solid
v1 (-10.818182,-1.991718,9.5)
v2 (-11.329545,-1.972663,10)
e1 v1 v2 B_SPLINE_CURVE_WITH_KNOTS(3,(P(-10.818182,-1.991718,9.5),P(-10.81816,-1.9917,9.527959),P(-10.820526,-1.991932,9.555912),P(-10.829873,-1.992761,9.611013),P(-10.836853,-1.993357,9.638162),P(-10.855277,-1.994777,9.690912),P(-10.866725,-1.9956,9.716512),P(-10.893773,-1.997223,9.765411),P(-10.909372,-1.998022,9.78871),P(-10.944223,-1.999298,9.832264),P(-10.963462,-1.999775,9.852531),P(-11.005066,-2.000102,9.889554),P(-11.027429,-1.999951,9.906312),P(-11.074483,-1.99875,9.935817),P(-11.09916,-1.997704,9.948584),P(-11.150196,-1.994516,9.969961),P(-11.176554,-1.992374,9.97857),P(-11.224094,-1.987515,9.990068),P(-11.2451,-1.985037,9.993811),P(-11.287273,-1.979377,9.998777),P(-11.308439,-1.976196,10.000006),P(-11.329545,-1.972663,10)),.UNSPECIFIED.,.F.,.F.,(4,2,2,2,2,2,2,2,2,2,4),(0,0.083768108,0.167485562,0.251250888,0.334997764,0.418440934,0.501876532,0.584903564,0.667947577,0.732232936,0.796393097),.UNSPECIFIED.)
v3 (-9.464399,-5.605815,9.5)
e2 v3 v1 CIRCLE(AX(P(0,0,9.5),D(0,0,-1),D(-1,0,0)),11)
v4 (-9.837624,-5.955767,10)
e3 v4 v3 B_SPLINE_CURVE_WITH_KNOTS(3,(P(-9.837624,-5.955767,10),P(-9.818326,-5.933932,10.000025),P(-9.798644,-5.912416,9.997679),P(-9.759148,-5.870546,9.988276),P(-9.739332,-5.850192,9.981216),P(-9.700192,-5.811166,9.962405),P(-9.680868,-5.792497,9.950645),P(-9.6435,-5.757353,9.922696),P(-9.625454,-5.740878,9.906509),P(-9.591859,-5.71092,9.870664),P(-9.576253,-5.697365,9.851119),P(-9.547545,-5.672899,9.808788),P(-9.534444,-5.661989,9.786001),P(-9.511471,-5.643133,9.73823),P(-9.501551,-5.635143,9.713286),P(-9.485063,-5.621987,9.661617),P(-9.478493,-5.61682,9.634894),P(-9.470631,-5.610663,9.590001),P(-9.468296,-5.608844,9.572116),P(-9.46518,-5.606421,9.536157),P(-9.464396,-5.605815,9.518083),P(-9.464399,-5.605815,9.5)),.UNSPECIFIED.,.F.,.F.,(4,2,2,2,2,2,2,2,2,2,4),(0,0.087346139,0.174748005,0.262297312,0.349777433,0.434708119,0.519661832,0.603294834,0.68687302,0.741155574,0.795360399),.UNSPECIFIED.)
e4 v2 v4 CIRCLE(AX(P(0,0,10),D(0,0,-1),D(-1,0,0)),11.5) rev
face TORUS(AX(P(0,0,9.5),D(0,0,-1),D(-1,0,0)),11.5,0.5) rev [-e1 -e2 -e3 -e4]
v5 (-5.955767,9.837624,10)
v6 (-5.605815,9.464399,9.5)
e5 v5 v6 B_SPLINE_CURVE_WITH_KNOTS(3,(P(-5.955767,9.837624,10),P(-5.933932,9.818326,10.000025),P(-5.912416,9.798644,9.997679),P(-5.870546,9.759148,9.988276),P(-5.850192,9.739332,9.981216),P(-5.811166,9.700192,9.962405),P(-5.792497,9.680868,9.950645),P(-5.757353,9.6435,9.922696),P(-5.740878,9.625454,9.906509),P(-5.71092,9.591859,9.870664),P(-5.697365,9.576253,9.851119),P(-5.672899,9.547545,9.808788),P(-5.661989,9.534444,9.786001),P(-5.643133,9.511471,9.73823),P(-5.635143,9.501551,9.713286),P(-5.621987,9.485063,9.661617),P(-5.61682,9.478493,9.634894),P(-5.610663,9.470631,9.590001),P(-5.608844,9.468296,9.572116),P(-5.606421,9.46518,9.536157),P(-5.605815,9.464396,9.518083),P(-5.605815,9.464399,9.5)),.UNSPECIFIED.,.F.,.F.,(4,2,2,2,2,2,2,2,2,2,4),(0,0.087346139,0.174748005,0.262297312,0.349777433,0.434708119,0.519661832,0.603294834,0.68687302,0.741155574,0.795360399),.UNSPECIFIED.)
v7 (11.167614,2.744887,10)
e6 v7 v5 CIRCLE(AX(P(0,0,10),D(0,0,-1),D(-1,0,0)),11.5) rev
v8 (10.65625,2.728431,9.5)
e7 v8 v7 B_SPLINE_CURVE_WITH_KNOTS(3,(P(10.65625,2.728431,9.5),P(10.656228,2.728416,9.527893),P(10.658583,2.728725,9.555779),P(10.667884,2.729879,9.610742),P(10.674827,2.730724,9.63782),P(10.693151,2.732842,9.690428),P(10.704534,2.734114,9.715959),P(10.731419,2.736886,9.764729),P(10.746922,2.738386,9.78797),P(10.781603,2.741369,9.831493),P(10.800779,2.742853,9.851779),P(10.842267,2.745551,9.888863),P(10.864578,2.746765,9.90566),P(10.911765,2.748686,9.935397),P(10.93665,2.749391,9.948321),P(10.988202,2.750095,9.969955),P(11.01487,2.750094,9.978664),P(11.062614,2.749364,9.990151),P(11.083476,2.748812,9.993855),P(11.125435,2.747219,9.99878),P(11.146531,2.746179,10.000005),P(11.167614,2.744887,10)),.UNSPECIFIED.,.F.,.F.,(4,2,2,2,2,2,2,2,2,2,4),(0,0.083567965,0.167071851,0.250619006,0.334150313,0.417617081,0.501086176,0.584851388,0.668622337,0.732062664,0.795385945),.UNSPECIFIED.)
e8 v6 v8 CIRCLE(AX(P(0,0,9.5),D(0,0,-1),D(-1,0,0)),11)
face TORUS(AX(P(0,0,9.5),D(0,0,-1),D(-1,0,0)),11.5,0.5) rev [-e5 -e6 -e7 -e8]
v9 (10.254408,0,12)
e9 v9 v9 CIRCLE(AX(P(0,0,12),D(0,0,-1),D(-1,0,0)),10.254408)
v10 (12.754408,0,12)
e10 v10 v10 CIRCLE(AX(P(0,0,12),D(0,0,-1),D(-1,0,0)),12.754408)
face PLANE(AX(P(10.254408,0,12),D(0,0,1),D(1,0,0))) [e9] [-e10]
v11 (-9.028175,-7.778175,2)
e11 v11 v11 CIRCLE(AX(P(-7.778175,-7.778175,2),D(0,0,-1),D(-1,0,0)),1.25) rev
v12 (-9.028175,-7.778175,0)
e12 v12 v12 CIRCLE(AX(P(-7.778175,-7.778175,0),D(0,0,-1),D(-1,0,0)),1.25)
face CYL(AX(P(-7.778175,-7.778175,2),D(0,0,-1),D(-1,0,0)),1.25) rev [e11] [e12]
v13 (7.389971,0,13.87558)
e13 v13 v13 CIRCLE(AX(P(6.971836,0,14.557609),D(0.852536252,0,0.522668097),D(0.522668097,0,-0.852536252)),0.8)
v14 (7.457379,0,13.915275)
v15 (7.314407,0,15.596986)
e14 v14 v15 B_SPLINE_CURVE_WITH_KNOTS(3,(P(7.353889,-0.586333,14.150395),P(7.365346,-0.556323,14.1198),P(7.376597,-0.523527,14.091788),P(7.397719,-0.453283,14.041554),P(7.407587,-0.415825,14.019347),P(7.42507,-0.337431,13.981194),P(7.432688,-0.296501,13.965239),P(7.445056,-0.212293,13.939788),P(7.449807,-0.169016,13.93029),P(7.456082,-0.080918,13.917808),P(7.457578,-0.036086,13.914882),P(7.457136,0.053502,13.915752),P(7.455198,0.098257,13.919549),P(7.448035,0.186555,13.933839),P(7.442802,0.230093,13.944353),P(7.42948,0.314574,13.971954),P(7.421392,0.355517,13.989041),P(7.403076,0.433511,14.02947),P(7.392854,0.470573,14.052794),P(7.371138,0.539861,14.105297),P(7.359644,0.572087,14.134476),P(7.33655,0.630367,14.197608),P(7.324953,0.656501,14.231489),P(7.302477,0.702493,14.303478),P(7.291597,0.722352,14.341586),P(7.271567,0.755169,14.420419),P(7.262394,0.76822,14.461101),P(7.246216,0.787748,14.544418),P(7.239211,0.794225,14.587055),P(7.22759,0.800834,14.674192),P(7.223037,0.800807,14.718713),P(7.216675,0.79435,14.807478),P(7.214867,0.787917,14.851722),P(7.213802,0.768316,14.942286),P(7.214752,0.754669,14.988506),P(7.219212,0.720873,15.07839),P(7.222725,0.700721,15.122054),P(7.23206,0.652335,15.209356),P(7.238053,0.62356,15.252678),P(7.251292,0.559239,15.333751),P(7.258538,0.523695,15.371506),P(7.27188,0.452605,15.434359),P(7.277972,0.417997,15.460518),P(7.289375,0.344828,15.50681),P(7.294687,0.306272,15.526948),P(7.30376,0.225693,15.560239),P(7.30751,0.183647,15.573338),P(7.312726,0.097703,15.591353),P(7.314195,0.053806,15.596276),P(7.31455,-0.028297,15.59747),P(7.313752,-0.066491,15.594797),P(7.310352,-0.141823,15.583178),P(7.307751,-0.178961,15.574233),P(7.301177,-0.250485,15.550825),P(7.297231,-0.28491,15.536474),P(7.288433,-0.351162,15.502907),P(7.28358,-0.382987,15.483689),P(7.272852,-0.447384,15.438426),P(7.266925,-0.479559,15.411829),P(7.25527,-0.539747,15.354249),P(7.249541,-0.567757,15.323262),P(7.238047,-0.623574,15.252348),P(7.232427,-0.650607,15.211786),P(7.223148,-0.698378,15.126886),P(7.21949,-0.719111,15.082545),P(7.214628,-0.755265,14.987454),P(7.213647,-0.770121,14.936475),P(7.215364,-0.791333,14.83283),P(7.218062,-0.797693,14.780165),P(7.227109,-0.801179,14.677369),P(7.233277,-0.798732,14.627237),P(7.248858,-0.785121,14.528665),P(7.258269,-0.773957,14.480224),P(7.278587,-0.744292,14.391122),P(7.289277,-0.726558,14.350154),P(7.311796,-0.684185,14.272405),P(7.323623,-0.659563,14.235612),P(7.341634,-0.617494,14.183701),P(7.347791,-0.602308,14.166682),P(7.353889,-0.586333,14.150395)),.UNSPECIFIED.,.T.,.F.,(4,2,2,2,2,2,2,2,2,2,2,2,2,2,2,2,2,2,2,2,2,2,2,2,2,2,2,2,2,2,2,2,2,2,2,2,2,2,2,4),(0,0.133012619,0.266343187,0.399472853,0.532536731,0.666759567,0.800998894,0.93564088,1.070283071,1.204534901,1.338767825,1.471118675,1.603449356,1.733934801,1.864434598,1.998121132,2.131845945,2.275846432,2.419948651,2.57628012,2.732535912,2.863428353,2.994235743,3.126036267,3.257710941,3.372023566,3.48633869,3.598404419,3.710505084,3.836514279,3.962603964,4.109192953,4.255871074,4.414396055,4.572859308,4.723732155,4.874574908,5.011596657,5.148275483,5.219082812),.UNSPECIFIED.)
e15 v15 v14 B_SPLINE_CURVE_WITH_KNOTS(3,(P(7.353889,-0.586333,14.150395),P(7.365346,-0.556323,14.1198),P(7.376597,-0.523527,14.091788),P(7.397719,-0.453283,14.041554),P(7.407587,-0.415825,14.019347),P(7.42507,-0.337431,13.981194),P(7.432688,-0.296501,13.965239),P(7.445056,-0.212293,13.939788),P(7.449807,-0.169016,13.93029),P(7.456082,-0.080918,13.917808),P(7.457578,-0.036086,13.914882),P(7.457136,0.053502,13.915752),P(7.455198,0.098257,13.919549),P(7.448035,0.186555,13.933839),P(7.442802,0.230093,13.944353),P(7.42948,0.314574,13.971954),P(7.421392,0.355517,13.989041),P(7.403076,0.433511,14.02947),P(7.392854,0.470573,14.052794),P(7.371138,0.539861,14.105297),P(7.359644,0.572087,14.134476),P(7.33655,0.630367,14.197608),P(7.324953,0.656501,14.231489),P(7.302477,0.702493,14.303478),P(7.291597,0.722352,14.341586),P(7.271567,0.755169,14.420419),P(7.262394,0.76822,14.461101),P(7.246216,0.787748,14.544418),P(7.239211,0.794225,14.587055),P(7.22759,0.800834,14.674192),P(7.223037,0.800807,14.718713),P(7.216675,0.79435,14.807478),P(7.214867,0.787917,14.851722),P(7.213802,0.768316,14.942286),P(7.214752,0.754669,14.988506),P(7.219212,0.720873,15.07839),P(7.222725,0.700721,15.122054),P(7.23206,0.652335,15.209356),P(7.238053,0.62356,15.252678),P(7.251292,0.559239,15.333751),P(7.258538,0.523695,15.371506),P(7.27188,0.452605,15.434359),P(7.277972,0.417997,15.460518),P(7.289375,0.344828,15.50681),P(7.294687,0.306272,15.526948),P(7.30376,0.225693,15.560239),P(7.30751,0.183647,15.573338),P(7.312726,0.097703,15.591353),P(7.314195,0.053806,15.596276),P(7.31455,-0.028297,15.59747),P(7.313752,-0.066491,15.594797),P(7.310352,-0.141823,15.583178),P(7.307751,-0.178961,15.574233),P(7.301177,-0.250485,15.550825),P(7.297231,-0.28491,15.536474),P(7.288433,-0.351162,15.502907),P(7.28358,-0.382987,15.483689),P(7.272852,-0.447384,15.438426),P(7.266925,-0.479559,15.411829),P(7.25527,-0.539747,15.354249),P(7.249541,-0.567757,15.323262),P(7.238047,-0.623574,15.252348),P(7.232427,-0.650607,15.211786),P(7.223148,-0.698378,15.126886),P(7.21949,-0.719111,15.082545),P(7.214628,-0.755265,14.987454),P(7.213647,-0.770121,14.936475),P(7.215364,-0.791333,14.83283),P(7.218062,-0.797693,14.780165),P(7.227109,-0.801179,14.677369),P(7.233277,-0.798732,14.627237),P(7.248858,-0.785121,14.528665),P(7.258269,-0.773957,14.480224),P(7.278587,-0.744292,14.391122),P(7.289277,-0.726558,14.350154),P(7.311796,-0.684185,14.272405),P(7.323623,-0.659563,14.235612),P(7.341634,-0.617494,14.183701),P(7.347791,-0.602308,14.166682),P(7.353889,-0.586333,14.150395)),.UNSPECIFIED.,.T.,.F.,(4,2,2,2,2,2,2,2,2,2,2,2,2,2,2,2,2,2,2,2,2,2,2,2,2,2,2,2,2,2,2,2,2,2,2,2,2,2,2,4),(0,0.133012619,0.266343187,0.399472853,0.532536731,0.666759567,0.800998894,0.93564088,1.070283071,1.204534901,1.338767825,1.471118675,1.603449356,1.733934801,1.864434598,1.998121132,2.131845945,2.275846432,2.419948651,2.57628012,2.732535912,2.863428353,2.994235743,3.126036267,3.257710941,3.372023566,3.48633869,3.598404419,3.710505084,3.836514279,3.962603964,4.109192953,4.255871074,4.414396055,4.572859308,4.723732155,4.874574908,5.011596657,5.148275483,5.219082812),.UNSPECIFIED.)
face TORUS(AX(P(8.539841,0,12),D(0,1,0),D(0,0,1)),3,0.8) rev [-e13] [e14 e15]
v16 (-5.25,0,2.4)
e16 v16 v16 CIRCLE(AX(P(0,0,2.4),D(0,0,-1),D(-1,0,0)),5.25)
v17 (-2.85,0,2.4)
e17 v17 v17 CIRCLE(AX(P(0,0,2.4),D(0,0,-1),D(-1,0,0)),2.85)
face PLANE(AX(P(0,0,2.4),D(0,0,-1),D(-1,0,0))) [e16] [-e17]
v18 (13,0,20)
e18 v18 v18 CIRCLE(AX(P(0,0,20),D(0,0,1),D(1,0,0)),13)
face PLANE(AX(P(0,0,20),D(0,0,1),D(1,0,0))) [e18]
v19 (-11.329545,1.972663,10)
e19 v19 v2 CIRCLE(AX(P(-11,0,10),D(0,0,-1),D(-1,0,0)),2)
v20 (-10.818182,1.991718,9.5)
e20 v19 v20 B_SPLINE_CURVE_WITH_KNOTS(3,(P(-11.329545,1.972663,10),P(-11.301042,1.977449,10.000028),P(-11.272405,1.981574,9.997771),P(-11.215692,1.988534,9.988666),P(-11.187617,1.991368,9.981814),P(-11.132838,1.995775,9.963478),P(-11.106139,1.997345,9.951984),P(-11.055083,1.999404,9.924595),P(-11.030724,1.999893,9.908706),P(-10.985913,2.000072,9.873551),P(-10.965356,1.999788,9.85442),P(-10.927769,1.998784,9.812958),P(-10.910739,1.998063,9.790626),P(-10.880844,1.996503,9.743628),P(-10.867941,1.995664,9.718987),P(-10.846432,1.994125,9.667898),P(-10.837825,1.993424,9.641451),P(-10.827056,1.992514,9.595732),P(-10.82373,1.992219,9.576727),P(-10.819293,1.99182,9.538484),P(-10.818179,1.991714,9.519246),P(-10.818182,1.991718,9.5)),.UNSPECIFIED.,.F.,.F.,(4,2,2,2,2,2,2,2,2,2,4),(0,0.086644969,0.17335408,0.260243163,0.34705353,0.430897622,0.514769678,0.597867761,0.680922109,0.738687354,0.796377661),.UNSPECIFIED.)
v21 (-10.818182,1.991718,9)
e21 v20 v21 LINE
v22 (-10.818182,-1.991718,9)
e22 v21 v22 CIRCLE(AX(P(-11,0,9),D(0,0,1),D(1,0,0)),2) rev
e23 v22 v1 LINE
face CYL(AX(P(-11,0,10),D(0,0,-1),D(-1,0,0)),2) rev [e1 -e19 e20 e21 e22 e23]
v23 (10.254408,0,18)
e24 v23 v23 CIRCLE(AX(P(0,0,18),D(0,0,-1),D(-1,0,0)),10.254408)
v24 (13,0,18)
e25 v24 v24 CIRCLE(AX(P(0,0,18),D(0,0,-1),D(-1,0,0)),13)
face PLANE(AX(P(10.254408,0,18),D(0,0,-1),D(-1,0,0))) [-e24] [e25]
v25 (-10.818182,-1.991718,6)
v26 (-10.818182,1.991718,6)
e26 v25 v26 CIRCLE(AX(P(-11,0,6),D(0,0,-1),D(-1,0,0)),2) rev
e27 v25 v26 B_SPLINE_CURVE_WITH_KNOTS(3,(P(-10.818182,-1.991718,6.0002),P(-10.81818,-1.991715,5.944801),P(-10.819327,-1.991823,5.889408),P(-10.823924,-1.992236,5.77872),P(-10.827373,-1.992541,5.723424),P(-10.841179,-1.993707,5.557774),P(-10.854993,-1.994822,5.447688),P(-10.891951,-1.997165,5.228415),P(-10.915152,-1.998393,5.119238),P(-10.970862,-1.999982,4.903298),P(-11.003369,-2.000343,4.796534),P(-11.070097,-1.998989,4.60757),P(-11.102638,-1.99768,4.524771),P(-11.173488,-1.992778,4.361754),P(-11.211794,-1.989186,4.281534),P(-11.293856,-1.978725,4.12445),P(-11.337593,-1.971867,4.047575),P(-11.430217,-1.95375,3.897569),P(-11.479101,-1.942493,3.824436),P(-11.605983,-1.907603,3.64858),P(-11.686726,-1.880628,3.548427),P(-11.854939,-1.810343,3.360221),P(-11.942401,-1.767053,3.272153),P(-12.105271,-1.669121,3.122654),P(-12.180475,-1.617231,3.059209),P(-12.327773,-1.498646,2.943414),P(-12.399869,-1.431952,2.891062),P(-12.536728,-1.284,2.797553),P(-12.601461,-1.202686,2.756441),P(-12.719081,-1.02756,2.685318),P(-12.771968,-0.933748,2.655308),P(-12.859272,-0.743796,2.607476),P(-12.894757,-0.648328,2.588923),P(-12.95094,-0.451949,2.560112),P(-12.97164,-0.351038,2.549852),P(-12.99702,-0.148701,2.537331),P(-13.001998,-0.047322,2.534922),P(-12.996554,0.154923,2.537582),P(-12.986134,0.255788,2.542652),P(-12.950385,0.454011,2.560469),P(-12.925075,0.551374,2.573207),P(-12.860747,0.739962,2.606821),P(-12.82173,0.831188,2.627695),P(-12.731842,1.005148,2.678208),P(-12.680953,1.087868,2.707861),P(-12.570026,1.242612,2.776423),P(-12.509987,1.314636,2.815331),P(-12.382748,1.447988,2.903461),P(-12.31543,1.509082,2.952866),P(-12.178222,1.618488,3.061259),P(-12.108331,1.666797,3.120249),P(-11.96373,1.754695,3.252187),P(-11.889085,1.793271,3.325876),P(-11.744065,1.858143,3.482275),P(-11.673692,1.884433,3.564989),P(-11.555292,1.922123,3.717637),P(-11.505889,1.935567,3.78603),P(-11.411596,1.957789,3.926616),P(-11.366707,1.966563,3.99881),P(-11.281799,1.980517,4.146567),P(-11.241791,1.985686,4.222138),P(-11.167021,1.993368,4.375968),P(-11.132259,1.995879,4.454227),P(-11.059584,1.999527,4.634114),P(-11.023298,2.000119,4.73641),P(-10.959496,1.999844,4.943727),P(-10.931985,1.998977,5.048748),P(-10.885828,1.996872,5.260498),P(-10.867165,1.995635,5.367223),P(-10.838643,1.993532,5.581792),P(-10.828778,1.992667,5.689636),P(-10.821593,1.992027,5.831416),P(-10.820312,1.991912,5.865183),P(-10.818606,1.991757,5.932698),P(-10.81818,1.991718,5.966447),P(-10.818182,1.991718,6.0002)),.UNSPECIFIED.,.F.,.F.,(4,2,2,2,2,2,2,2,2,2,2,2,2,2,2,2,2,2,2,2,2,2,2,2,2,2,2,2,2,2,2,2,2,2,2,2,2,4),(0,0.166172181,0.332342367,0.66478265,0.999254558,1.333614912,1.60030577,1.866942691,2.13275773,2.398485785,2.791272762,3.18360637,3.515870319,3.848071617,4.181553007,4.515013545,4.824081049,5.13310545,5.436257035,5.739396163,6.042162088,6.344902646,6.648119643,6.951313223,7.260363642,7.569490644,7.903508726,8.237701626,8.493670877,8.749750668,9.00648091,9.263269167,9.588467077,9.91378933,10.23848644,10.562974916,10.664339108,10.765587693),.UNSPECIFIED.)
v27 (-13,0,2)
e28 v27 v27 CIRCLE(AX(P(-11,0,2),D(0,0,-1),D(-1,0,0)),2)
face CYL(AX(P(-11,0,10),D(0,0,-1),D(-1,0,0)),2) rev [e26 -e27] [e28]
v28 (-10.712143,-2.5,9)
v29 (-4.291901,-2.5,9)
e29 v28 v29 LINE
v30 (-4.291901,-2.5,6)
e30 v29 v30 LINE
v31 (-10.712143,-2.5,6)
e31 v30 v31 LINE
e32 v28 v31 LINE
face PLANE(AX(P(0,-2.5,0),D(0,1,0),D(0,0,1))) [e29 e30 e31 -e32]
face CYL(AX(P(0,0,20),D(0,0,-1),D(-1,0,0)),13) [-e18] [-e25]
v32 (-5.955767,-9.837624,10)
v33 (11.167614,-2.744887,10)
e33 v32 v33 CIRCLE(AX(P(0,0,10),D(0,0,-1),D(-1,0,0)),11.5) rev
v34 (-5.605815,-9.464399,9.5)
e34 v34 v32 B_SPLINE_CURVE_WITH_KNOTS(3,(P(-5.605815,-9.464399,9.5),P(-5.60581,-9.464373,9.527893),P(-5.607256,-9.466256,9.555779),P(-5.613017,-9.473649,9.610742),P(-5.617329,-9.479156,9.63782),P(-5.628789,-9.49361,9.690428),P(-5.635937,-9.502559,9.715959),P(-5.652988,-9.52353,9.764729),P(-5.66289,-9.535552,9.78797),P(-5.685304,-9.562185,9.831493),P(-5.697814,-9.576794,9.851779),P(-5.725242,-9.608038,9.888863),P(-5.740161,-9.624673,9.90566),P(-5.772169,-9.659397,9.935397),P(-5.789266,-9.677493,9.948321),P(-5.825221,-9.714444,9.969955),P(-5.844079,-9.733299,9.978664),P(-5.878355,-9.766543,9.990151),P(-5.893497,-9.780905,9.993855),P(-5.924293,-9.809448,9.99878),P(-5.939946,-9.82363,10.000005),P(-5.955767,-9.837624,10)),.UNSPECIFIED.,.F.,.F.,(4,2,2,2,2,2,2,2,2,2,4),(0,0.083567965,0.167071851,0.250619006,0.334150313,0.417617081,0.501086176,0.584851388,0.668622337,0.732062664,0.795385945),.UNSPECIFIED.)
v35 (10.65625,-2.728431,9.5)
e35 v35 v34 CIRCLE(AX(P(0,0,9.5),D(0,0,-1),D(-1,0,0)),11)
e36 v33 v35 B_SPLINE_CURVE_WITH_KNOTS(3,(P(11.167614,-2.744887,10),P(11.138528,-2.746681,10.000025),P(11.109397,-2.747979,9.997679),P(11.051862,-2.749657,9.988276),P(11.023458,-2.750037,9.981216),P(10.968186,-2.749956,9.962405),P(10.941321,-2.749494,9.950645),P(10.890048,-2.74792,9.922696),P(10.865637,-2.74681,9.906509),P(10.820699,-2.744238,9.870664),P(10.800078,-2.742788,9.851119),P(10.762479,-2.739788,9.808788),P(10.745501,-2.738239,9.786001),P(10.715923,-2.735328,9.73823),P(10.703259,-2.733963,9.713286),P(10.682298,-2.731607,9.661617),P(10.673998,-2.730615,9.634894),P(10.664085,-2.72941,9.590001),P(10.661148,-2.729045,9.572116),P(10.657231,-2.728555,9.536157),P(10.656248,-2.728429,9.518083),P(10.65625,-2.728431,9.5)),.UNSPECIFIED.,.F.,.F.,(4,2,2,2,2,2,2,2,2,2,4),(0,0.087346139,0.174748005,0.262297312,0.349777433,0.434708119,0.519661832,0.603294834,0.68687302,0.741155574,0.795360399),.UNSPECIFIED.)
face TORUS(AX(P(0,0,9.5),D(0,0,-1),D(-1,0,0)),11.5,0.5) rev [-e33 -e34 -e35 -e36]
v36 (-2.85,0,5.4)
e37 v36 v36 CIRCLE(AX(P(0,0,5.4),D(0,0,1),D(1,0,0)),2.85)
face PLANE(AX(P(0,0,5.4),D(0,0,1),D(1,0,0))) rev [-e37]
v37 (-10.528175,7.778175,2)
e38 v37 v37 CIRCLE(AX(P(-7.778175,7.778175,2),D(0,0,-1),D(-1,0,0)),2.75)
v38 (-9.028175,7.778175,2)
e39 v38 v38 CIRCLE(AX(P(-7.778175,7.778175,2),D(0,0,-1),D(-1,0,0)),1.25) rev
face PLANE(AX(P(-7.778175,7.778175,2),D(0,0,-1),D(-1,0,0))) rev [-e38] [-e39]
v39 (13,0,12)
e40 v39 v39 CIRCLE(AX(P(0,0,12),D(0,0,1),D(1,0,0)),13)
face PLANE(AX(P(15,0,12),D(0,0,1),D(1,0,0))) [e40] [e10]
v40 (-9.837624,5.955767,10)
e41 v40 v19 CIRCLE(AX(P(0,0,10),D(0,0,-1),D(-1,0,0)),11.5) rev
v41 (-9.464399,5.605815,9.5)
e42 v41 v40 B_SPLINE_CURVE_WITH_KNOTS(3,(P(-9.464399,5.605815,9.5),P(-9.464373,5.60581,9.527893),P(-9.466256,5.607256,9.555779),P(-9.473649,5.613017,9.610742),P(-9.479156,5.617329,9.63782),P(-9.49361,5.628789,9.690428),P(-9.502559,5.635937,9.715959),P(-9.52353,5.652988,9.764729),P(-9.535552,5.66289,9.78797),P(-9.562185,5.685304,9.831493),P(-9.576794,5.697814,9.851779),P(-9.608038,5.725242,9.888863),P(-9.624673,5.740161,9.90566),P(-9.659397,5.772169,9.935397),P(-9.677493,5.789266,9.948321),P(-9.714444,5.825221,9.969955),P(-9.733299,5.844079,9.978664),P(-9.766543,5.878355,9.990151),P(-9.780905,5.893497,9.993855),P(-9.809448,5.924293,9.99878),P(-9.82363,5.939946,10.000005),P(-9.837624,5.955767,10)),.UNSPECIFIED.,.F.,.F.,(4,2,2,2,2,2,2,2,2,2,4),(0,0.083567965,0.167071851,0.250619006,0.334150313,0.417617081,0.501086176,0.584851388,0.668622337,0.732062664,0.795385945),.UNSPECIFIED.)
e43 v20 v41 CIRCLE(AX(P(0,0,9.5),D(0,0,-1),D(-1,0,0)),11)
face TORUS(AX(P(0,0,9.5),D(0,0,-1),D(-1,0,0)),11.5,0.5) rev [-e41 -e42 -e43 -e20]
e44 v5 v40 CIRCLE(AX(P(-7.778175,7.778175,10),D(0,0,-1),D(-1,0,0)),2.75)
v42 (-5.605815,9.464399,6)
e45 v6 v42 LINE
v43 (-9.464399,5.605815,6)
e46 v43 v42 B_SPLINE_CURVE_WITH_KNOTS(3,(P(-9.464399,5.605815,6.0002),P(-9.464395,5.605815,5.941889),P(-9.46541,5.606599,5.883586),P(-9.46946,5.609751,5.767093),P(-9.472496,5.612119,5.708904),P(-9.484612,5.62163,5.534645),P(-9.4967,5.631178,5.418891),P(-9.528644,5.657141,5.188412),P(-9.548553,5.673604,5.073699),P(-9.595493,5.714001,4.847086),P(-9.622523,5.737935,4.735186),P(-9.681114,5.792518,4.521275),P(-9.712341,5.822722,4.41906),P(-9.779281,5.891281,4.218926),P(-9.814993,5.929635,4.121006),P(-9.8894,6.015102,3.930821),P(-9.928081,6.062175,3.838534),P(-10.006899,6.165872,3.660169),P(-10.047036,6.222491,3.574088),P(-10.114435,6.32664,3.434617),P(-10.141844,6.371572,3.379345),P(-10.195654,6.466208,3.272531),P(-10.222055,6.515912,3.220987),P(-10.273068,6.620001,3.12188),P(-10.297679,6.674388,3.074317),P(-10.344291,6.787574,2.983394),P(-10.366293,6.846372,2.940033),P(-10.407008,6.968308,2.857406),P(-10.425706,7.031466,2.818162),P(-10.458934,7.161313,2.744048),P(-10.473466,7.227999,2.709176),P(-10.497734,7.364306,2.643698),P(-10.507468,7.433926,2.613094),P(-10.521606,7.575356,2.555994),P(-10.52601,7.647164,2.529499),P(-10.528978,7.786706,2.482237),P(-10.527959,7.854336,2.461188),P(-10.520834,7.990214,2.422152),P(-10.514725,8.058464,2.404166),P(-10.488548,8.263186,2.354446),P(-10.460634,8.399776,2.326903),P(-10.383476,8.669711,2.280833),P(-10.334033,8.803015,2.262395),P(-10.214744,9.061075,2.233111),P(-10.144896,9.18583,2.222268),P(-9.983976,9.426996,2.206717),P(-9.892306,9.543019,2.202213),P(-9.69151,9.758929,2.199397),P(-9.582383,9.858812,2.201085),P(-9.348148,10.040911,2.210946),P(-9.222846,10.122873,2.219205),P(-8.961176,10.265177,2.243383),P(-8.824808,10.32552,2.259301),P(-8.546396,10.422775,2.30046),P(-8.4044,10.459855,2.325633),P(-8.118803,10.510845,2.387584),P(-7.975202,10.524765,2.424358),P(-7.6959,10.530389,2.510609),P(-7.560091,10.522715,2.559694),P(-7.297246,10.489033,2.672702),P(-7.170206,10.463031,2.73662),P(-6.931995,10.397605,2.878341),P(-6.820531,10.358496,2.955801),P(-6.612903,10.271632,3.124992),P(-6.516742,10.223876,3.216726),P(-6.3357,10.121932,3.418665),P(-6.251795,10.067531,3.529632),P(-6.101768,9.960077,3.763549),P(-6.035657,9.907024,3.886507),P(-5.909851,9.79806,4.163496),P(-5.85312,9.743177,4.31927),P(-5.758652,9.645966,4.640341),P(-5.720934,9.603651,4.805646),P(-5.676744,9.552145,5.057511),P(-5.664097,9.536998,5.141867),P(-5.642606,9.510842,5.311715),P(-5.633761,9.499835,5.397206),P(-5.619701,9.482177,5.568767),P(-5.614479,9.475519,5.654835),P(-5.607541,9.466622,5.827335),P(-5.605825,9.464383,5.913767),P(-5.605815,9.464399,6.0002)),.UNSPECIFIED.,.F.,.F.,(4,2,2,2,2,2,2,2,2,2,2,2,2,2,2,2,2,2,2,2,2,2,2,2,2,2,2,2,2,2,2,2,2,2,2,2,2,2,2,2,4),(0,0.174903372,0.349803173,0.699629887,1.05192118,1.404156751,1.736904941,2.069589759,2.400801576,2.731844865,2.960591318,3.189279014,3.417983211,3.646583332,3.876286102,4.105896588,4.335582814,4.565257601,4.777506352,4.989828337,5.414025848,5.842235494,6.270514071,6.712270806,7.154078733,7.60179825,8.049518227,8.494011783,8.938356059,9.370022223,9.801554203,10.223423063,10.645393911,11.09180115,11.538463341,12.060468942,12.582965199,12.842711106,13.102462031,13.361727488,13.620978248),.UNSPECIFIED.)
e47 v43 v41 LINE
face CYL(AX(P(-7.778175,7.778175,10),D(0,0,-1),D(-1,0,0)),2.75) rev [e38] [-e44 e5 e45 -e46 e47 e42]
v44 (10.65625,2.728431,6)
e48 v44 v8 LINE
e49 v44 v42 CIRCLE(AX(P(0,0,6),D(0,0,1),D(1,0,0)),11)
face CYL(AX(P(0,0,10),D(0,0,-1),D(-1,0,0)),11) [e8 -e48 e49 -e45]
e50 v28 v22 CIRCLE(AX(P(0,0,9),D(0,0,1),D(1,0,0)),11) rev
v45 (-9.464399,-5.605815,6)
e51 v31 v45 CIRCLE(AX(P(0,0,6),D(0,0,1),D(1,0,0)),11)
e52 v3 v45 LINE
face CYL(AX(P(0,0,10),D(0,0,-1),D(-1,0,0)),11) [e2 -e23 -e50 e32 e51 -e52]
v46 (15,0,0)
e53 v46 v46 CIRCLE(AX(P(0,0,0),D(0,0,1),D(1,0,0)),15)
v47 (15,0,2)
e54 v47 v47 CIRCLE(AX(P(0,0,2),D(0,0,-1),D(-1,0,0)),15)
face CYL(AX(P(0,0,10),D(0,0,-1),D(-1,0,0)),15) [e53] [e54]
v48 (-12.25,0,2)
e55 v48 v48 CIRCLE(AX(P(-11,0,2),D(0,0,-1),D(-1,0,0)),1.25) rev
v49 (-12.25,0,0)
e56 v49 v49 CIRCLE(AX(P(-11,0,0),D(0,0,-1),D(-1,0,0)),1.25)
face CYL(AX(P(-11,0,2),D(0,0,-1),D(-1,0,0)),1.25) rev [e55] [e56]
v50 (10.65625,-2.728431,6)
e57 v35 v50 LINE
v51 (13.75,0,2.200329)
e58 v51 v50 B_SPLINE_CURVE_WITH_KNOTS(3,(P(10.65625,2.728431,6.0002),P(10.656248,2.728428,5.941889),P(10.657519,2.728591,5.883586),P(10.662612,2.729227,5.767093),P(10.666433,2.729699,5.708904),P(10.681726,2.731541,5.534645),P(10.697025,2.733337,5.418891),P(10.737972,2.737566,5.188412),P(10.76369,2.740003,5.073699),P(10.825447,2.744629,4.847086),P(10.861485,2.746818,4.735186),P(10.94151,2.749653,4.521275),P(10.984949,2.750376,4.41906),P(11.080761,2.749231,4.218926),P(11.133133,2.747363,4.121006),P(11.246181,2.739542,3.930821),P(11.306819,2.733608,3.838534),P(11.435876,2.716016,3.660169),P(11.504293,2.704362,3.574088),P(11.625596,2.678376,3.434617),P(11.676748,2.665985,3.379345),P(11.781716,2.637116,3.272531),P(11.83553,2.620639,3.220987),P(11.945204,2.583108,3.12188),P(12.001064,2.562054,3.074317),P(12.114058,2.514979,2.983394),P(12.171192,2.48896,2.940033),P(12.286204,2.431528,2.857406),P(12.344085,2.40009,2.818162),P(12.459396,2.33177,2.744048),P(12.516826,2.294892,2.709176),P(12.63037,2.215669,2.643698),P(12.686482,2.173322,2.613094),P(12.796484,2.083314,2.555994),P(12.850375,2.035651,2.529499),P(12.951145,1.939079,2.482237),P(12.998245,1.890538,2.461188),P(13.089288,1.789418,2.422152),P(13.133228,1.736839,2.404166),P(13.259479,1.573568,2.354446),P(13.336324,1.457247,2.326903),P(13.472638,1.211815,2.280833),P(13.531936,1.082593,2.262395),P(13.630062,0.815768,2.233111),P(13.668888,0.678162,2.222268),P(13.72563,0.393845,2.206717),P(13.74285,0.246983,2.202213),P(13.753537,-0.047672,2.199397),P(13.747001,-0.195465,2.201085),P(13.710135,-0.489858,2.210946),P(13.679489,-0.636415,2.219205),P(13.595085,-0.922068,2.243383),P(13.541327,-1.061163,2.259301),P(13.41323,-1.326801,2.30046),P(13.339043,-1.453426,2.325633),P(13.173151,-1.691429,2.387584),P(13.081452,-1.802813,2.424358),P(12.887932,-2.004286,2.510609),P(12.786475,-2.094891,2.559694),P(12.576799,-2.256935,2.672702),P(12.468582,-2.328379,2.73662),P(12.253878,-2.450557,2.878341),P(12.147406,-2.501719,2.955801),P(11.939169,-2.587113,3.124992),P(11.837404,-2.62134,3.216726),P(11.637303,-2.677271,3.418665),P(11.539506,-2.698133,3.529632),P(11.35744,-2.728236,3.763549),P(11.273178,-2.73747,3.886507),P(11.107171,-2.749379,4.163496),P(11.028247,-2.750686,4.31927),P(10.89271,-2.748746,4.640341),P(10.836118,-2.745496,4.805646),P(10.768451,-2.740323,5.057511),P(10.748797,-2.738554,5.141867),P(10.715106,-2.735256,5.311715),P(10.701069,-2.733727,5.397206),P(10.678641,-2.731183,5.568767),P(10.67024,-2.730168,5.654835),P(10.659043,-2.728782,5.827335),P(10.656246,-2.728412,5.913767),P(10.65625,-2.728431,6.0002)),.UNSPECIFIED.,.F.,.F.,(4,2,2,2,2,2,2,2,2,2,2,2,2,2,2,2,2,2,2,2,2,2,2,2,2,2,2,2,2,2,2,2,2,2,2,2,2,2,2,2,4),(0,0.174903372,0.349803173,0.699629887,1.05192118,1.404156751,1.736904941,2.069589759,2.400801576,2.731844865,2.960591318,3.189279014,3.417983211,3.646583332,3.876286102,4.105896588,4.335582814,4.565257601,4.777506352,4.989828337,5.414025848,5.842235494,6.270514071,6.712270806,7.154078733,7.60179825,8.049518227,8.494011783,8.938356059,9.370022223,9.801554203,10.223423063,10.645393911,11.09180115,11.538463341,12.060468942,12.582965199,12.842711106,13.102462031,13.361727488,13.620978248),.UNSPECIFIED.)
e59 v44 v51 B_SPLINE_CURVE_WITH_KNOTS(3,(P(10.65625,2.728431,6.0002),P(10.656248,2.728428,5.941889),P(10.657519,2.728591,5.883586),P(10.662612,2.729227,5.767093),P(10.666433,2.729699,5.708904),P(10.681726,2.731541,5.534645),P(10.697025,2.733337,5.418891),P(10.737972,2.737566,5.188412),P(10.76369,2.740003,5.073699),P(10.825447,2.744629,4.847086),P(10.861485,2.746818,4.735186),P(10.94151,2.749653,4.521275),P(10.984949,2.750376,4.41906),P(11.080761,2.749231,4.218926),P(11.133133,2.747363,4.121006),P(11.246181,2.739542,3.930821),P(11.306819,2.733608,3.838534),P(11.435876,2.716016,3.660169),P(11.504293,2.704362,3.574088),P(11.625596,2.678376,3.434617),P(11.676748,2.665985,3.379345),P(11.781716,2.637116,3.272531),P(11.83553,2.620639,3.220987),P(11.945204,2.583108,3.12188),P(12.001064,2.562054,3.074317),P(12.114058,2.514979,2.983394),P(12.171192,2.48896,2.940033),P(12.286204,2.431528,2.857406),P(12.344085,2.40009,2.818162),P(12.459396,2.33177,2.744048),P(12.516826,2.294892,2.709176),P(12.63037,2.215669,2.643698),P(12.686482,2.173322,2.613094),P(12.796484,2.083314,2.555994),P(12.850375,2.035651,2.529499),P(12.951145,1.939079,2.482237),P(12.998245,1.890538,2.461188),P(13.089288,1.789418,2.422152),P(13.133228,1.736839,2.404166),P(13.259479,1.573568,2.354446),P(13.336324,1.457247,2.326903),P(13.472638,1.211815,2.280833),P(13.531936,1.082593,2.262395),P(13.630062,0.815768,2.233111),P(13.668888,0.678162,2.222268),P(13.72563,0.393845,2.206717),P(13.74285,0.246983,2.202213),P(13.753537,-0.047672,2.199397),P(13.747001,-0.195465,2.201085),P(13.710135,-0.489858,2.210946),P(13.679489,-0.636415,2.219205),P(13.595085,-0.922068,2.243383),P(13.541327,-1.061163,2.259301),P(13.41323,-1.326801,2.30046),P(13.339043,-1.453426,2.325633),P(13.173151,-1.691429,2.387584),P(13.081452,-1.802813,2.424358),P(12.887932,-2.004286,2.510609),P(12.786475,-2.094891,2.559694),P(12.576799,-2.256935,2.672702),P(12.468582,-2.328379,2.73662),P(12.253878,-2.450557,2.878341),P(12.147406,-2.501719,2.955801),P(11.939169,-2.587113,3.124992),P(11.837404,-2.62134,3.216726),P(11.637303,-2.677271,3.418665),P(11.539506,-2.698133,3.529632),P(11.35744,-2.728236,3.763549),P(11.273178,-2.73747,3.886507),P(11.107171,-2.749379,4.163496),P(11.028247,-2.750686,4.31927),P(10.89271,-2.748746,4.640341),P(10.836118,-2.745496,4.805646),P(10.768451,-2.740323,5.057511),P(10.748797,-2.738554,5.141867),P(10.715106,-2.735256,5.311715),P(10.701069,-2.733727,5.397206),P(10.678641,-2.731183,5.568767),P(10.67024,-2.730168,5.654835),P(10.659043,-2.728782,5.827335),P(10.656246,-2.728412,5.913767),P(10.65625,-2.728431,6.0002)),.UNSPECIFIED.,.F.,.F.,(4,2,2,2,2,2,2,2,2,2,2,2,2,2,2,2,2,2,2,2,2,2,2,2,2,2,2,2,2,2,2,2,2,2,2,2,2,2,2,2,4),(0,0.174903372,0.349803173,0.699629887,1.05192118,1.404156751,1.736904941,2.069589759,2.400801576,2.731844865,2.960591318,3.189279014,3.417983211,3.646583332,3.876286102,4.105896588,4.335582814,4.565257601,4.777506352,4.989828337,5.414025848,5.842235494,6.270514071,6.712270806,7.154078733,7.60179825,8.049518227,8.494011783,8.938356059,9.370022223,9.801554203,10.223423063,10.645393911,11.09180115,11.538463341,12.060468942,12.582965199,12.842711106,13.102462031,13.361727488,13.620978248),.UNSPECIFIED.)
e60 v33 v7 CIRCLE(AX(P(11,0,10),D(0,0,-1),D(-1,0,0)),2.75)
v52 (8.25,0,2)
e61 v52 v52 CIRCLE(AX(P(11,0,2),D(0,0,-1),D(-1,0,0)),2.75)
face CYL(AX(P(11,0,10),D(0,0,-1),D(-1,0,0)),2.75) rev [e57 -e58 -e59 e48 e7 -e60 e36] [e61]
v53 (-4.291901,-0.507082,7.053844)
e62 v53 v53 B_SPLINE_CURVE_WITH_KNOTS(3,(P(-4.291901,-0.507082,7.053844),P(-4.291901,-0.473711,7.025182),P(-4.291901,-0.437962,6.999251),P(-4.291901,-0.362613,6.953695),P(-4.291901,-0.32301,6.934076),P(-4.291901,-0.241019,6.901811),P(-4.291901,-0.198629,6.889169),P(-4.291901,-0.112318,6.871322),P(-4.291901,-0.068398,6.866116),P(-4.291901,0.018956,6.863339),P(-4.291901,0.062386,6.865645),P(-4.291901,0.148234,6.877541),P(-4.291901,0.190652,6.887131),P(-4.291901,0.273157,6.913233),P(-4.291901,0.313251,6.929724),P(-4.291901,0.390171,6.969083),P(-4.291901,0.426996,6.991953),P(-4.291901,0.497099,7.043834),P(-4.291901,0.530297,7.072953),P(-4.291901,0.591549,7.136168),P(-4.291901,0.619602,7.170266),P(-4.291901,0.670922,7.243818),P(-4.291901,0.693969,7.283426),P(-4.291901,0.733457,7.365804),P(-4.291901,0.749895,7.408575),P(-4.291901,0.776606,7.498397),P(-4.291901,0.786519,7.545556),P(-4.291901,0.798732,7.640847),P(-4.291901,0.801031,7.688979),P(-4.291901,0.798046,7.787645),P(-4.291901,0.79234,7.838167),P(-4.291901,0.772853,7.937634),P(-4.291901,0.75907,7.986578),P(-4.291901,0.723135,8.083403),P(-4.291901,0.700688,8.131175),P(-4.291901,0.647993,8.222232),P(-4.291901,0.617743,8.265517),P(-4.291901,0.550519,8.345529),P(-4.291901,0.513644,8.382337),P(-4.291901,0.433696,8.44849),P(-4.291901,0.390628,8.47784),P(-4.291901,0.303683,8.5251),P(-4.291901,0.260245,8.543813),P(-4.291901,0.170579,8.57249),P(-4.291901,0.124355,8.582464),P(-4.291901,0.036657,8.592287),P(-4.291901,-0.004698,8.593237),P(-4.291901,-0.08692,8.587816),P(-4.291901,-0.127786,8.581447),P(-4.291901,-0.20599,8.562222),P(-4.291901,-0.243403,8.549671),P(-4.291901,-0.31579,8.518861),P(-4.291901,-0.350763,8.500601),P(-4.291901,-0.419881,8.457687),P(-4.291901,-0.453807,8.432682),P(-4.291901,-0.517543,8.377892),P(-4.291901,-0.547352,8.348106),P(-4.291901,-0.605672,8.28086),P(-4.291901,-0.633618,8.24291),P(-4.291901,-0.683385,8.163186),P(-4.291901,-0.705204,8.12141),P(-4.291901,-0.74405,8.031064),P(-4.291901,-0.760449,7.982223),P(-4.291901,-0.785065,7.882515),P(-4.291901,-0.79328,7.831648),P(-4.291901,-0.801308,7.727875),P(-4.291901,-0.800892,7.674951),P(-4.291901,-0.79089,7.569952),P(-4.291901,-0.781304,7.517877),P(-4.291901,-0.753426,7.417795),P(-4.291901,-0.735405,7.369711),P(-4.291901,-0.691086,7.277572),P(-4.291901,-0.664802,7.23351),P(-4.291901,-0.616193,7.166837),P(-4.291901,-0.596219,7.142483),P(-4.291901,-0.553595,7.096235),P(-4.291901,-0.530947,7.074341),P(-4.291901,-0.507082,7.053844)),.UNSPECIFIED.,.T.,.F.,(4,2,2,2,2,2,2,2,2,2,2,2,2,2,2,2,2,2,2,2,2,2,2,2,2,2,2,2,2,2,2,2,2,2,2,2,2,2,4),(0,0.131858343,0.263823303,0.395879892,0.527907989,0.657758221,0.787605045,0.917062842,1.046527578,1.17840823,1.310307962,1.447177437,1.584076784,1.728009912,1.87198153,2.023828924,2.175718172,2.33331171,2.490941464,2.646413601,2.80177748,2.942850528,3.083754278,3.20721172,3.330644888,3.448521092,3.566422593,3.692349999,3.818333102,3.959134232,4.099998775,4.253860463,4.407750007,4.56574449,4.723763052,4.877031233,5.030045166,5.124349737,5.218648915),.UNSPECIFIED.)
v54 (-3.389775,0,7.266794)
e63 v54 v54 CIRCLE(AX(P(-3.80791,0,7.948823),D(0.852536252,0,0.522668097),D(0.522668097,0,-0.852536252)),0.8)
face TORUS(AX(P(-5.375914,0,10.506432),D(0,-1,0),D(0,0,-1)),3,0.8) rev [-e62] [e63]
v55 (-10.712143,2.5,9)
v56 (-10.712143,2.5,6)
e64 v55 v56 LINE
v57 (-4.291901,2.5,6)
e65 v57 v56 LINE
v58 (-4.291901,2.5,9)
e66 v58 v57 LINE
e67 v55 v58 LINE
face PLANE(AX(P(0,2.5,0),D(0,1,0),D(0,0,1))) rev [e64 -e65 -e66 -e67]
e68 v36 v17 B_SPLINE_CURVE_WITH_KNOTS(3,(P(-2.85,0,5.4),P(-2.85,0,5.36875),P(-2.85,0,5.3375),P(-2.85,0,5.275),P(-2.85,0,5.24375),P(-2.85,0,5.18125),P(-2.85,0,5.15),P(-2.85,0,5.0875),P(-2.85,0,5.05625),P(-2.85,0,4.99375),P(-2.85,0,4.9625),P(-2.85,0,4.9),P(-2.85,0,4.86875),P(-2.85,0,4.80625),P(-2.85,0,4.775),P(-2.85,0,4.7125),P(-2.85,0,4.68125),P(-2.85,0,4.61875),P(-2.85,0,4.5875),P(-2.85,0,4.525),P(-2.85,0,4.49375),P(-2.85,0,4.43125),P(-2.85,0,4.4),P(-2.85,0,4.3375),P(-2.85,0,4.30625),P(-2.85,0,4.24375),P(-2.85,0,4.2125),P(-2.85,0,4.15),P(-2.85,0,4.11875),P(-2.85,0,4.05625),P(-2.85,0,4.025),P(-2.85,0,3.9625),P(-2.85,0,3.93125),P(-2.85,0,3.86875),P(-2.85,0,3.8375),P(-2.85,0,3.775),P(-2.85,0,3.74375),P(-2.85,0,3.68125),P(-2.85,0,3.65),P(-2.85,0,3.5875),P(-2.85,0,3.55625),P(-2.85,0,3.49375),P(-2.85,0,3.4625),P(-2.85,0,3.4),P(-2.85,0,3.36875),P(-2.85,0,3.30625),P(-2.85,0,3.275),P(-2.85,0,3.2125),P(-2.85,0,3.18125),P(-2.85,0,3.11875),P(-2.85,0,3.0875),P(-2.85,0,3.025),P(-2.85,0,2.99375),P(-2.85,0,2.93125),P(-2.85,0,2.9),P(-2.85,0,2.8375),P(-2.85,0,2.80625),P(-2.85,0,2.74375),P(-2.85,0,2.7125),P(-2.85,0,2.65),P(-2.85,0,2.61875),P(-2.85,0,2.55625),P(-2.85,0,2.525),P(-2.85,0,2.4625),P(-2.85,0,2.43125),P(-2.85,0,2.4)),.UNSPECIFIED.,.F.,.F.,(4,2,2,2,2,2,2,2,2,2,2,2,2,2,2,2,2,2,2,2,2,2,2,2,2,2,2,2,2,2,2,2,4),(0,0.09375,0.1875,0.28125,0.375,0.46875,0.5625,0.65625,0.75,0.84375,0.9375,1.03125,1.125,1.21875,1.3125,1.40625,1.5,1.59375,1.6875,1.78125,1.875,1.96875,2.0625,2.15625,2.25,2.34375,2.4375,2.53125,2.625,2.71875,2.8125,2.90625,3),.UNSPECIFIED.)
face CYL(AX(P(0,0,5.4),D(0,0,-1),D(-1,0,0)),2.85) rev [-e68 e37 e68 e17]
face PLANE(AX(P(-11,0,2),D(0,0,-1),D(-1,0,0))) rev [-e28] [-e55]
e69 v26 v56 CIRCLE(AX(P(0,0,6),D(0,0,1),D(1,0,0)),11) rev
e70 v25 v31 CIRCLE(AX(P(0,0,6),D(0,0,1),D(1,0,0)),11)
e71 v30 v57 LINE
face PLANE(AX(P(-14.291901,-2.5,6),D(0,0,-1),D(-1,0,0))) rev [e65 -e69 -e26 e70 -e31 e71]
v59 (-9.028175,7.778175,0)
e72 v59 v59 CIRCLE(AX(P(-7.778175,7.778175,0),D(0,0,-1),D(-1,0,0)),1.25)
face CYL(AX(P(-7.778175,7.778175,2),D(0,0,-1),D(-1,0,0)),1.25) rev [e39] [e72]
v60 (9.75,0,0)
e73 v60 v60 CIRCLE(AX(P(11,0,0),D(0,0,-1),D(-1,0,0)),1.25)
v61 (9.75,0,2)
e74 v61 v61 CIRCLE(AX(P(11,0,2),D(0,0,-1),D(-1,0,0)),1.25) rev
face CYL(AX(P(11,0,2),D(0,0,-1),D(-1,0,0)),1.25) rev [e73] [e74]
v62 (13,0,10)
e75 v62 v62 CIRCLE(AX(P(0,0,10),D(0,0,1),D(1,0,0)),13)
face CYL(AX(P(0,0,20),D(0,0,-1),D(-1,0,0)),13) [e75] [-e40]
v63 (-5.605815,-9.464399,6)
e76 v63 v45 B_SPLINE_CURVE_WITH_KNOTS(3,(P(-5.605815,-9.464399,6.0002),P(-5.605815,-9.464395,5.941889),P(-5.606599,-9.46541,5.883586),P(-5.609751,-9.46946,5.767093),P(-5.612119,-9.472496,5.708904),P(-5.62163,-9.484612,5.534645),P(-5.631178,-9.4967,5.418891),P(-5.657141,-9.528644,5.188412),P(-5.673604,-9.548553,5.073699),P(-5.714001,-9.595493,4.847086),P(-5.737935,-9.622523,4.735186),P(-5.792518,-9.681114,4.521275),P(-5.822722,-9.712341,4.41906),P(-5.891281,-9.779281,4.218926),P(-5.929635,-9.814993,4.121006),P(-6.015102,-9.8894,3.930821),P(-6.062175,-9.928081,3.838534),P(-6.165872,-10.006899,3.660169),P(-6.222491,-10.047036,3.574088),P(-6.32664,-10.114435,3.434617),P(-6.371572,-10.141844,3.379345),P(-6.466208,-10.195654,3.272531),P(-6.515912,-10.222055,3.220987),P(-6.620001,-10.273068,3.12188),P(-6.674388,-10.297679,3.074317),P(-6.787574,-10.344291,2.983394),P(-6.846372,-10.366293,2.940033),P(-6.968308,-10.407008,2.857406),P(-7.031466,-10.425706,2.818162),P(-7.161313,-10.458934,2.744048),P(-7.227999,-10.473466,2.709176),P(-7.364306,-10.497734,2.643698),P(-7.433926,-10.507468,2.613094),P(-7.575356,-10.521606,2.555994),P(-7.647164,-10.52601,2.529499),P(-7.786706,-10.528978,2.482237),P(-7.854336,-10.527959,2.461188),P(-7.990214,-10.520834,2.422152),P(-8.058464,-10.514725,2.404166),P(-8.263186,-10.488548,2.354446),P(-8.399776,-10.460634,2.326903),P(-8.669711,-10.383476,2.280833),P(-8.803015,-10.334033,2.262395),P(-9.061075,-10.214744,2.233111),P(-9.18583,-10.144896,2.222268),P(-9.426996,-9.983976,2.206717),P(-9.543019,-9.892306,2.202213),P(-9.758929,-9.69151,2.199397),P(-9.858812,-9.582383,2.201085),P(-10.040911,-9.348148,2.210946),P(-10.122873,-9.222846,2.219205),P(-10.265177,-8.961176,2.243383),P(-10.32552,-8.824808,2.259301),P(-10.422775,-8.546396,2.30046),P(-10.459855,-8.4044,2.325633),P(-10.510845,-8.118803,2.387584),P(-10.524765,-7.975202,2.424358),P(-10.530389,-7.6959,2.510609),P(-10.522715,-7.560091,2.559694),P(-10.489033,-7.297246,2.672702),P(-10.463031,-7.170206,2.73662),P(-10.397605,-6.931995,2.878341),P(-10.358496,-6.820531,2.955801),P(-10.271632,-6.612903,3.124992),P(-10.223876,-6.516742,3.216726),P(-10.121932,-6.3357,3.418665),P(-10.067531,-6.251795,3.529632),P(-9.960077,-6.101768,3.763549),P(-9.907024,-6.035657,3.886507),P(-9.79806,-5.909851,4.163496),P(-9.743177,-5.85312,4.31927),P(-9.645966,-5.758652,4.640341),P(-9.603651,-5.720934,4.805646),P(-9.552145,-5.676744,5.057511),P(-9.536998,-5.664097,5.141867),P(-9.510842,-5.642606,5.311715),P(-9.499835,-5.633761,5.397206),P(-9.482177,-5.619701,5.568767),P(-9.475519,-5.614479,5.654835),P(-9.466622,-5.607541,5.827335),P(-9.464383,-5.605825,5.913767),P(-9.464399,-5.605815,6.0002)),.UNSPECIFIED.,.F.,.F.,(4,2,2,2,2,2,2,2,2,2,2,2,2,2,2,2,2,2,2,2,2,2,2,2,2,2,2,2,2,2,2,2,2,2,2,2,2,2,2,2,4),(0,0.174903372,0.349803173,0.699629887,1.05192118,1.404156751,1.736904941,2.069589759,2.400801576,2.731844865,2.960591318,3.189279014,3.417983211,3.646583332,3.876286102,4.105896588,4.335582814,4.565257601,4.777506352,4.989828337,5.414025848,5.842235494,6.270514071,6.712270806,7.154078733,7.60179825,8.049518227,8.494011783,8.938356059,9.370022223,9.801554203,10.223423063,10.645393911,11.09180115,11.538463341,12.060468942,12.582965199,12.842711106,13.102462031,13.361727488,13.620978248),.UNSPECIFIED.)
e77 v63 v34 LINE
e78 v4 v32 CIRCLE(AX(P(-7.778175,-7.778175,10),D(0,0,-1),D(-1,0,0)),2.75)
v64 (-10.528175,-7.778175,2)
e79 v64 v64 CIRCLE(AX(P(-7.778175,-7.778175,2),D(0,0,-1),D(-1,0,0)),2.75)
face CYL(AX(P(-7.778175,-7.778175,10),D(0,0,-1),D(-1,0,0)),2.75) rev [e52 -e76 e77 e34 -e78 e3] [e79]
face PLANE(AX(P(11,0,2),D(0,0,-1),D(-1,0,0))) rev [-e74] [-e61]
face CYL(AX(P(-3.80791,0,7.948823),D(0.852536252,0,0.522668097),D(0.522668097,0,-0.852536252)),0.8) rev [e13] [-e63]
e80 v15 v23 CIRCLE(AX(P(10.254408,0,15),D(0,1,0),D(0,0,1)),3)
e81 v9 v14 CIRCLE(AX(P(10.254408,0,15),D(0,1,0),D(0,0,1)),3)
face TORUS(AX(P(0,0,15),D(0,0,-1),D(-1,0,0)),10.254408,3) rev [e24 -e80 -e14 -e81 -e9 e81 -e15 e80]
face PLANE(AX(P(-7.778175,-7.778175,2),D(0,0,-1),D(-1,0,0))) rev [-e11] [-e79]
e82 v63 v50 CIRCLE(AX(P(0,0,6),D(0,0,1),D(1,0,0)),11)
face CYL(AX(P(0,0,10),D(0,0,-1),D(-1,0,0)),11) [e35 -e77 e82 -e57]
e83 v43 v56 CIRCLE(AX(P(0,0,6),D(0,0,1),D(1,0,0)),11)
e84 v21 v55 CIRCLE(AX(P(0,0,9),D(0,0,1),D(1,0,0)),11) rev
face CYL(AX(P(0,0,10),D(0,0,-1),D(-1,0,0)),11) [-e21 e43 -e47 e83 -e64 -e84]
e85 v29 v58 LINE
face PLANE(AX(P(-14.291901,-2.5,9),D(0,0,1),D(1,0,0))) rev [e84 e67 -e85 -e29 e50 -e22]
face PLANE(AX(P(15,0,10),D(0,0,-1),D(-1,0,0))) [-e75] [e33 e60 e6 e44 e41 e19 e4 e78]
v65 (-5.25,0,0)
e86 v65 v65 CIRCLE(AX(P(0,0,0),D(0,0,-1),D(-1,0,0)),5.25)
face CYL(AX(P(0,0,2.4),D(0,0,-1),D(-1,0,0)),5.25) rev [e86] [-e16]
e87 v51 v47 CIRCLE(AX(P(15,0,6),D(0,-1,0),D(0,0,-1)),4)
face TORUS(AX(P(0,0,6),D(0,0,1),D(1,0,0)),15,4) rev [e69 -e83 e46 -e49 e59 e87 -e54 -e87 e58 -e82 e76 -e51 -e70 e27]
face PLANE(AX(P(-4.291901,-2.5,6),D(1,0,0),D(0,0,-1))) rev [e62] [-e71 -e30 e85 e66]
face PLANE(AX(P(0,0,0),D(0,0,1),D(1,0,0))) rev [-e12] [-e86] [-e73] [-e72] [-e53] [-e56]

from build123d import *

# Parameters (mm, degrees)
SKETCH_1_R          = 15
EXTRUDE_1_DEPTH     = 10
SKETCH_3_R          = 2.85
CUT_EXTRUDE_1_DEPTH = 3.1
SKETCH_2_R          = 5.25
CUT_EXTRUDE_2_DEPTH = 2.4
SKETCH_5_R          = 13
EXTRUDE_2_DEPTH     = 10
SKETCH_11_W         = 4
SKETCH_11_H         = 8
FILLET_3_R          = 4
SKETCH_4_R          = 1.25
CUT_EXTRUDE_4_DEPTH = 2
SKETCH_12_R         = 2.75
SKETCH_12_R_2       = 2
CUT_EXTRUDE_5_DEPTH = 8
SKETCH_26_W         = 10
SKETCH_26_H         = 3
CUT_EXTRUDE_6_DEPTH = 2.5
SKETCH_29_R         = 0.8
FILLET_4_R          = 0.5
SKETCH_30_R         = 1.25
EXTRUDE_3_DEPTH     = 2


with BuildPart() as part:
    # 스케치1 → 보스-돌출1 (new body)
    with BuildSketch(Plane.XY):
        Circle(SKETCH_1_R)
    extrude(amount=EXTRUDE_1_DEPTH)

    # 스케치3 → 컷-돌출1 (cut)
    with BuildSketch(Plane.XY.offset(2.3)):
        with Locations(Location((0, 0, 0), (0, 0, 180))):
            Circle(SKETCH_3_R)
    extrude(amount=CUT_EXTRUDE_1_DEPTH, mode=Mode.SUBTRACT)

    # 스케치2 → 컷-돌출2 (cut)
    with BuildSketch(Plane(origin=(0, 0, 0), x_dir=(-1, 0, 0), z_dir=(0, 0, -1))):
        Circle(SKETCH_2_R)
    extrude(amount=-CUT_EXTRUDE_2_DEPTH, mode=Mode.SUBTRACT)

    # 스케치5 → 보스-돌출2 (add)
    with BuildSketch(Plane.XY.offset(10)):
        Circle(SKETCH_5_R)
    extrude(amount=EXTRUDE_2_DEPTH)

    # 컷-스윕2: sweep along a curve in space
    with BuildLine() as sweep_2_path:
        ThreePointArc((13, 0, 20), (9.192388155, 9.192388155, 20), (0, 13, 20))
        ThreePointArc((0, 13, 20), (-9.192388155, 9.192388155, 20), (-13, 0, 20))
        ThreePointArc((-13, 0, 20), (-9.192388155, -9.192388155, 20), (0, -13, 20))
        ThreePointArc((0, -13, 20), (9.192388155, -9.192388155, 20), (13, 0, 20))
    # 스케치10 → 컷-스윕2 (sweep, cut)
    with BuildSketch(Plane(origin=(0, 0, 0), x_dir=(1, 0, 0), z_dir=(0, 1, 0))):
        with BuildLine():
            Line((15, -18), (15, -12))
            Line((15, -12), (12.754407792, -12))
            Line((12.754407792, -12), (10.254407792, -12))
            ThreePointArc((10.254407792, -12), (7.254407792, -15), (10.254407792, -18))
            Line((10.254407792, -18), (15, -18))
        make_face()
    sweep(path=sweep_2_path.line, mode=Mode.SUBTRACT)

    # 컷-스윕3: sweep along a curve in space
    with BuildLine() as sweep_3_path:
        ThreePointArc((15, 0, 10), (10.606601718, 10.606601718, 10), (0, 15, 10))
        ThreePointArc((0, 15, 10), (-10.606601718, 10.606601718, 10), (-15, 0, 10))
        ThreePointArc((-15, 0, 10), (-10.606601718, -10.606601718, 10), (0, -15, 10))
        ThreePointArc((0, -15, 10), (10.606601718, -10.606601718, 10), (15, 0, 10))
    # 스케치11 → 컷-스윕3 (sweep, cut)
    with BuildSketch(Plane(origin=(0, 0, 0), x_dir=(1, 0, 0), z_dir=(0, 1, 0))):
        with Locations((13, -6)):
            Rectangle(SKETCH_11_W, SKETCH_11_H)
    sweep(path=sweep_3_path.line, mode=Mode.SUBTRACT)

    # 필렛3
    fillet_3_edges = [part.edges().sort_by_distance(p)[0] for p in [
        (0, 11, 2),
    ]]
    fillet(fillet_3_edges, radius=FILLET_3_R - 0.0001)  # a hair under: the kernel refuses the full size

    # 스케치4 → 컷-돌출4 (cut)
    with BuildSketch(Plane(origin=(0, 0, 0), x_dir=(-1, 0, 0), z_dir=(0, 0, -1))):
        with Locations((0, 11)):
            Circle(SKETCH_4_R)
        with Locations((7.778174593, 7.778174593)):
            Circle(SKETCH_4_R)
        with Locations((11, 0)):
            Circle(SKETCH_4_R)
        with Locations((7.778174593, -7.778174593)):
            Circle(SKETCH_4_R)
        with Locations((0, -11)):
            Circle(SKETCH_4_R)
        with Locations((-7.778174593, -7.778174593)):
            Circle(SKETCH_4_R)
        with Locations((-11, 0)):
            Circle(SKETCH_4_R)
        with Locations((-7.778174593, 7.778174593)):
            Circle(SKETCH_4_R)
    extrude(amount=-CUT_EXTRUDE_4_DEPTH, mode=Mode.SUBTRACT)

    # 스케치12 → 컷-돌출5 (cut)
    with BuildSketch(Plane(origin=(0, 0, 2), x_dir=(-1, 0, 0), z_dir=(0, 0, -1))):
        with Locations((-11, 0)):
            Circle(SKETCH_12_R)
        with Locations((7.778174593, 7.778174593)):
            Circle(SKETCH_12_R)
        with Locations((11, 0)):
            Circle(SKETCH_12_R_2)
        with Locations((7.778174593, -7.778174593)):
            Circle(SKETCH_12_R)
    extrude(amount=-CUT_EXTRUDE_5_DEPTH, mode=Mode.SUBTRACT)

    # 스케치26 → 컷-돌출6 (cut, symmetric)
    with BuildSketch(Plane(origin=(0, 0, 0), x_dir=(1, 0, 0), z_dir=(0, 1, 0))):
        with Locations((-9.291900756, -7.5)):
            Rectangle(SKETCH_26_W, SKETCH_26_H)
    extrude(amount=CUT_EXTRUDE_6_DEPTH, both=True, mode=Mode.SUBTRACT)

    # 컷-스윕30: sweep along a path in 스케치28
    with BuildLine(Plane(origin=(0, 0, 0), x_dir=(1, 0, 0), z_dir=(0, 1, 0))) as sweep_30_path:
        Line((-11, 0), (-11, -2))
        Line((-11, -2), (-11, -6.533577844))
        ThreePointArc((-11, -6.533577844), (-10.705022899, -7.242762383), (-9.994114577, -7.533560524))
        Line((-9.994114577, -7.533560524), (-5.393570244, -7.506483904))
        ThreePointArc((-5.393570244, -7.506483904), (-4.569805571, -7.616762546), (-3.807909683, -7.948823191))
        Line((-3.807909683, -7.948823191), (6.971836218, -14.557608755))
        ThreePointArc((6.971836218, -14.557608755), (7.725232095, -14.887284734), (8.539840508, -15))
        Line((8.539840508, -15), (10.254407792, -15))
    # 스케치29 → 컷-스윕30 (sweep, cut)
    with BuildSketch(Plane.XY):
        with Locations((-11, 0)):
            Circle(SKETCH_29_R)
    sweep(path=sweep_30_path.line, mode=Mode.SUBTRACT)

    # 필렛4
    fillet_4_edges = [part.edges().sort_by_distance(p)[0] for p in [
        (-10.301028645, -3.858601929, 10),
        (6.744896536, -8.689440184, 10),
        (4.209517756, 10.162674858, 10),
        (-10.301028645, 3.858601929, 10),
    ]]
    fillet(fillet_4_edges, radius=FILLET_4_R)

    # 스케치30 → 보스-돌출3 (add)
    with BuildSketch(Plane(origin=(0, 0, 0), x_dir=(-1, 0, 0), z_dir=(0, 0, -1))):
        with Locations((0, -11)):
            Circle(SKETCH_30_R)
        with Locations((-7.778174593, -7.778174593)):
            Circle(SKETCH_30_R)
        with Locations((0, 11)):
            Circle(SKETCH_30_R)
        with Locations((-7.778174593, 7.778174593)):
            Circle(SKETCH_30_R)
    extrude(amount=-EXTRUDE_3_DEPTH)


solid = part.part
